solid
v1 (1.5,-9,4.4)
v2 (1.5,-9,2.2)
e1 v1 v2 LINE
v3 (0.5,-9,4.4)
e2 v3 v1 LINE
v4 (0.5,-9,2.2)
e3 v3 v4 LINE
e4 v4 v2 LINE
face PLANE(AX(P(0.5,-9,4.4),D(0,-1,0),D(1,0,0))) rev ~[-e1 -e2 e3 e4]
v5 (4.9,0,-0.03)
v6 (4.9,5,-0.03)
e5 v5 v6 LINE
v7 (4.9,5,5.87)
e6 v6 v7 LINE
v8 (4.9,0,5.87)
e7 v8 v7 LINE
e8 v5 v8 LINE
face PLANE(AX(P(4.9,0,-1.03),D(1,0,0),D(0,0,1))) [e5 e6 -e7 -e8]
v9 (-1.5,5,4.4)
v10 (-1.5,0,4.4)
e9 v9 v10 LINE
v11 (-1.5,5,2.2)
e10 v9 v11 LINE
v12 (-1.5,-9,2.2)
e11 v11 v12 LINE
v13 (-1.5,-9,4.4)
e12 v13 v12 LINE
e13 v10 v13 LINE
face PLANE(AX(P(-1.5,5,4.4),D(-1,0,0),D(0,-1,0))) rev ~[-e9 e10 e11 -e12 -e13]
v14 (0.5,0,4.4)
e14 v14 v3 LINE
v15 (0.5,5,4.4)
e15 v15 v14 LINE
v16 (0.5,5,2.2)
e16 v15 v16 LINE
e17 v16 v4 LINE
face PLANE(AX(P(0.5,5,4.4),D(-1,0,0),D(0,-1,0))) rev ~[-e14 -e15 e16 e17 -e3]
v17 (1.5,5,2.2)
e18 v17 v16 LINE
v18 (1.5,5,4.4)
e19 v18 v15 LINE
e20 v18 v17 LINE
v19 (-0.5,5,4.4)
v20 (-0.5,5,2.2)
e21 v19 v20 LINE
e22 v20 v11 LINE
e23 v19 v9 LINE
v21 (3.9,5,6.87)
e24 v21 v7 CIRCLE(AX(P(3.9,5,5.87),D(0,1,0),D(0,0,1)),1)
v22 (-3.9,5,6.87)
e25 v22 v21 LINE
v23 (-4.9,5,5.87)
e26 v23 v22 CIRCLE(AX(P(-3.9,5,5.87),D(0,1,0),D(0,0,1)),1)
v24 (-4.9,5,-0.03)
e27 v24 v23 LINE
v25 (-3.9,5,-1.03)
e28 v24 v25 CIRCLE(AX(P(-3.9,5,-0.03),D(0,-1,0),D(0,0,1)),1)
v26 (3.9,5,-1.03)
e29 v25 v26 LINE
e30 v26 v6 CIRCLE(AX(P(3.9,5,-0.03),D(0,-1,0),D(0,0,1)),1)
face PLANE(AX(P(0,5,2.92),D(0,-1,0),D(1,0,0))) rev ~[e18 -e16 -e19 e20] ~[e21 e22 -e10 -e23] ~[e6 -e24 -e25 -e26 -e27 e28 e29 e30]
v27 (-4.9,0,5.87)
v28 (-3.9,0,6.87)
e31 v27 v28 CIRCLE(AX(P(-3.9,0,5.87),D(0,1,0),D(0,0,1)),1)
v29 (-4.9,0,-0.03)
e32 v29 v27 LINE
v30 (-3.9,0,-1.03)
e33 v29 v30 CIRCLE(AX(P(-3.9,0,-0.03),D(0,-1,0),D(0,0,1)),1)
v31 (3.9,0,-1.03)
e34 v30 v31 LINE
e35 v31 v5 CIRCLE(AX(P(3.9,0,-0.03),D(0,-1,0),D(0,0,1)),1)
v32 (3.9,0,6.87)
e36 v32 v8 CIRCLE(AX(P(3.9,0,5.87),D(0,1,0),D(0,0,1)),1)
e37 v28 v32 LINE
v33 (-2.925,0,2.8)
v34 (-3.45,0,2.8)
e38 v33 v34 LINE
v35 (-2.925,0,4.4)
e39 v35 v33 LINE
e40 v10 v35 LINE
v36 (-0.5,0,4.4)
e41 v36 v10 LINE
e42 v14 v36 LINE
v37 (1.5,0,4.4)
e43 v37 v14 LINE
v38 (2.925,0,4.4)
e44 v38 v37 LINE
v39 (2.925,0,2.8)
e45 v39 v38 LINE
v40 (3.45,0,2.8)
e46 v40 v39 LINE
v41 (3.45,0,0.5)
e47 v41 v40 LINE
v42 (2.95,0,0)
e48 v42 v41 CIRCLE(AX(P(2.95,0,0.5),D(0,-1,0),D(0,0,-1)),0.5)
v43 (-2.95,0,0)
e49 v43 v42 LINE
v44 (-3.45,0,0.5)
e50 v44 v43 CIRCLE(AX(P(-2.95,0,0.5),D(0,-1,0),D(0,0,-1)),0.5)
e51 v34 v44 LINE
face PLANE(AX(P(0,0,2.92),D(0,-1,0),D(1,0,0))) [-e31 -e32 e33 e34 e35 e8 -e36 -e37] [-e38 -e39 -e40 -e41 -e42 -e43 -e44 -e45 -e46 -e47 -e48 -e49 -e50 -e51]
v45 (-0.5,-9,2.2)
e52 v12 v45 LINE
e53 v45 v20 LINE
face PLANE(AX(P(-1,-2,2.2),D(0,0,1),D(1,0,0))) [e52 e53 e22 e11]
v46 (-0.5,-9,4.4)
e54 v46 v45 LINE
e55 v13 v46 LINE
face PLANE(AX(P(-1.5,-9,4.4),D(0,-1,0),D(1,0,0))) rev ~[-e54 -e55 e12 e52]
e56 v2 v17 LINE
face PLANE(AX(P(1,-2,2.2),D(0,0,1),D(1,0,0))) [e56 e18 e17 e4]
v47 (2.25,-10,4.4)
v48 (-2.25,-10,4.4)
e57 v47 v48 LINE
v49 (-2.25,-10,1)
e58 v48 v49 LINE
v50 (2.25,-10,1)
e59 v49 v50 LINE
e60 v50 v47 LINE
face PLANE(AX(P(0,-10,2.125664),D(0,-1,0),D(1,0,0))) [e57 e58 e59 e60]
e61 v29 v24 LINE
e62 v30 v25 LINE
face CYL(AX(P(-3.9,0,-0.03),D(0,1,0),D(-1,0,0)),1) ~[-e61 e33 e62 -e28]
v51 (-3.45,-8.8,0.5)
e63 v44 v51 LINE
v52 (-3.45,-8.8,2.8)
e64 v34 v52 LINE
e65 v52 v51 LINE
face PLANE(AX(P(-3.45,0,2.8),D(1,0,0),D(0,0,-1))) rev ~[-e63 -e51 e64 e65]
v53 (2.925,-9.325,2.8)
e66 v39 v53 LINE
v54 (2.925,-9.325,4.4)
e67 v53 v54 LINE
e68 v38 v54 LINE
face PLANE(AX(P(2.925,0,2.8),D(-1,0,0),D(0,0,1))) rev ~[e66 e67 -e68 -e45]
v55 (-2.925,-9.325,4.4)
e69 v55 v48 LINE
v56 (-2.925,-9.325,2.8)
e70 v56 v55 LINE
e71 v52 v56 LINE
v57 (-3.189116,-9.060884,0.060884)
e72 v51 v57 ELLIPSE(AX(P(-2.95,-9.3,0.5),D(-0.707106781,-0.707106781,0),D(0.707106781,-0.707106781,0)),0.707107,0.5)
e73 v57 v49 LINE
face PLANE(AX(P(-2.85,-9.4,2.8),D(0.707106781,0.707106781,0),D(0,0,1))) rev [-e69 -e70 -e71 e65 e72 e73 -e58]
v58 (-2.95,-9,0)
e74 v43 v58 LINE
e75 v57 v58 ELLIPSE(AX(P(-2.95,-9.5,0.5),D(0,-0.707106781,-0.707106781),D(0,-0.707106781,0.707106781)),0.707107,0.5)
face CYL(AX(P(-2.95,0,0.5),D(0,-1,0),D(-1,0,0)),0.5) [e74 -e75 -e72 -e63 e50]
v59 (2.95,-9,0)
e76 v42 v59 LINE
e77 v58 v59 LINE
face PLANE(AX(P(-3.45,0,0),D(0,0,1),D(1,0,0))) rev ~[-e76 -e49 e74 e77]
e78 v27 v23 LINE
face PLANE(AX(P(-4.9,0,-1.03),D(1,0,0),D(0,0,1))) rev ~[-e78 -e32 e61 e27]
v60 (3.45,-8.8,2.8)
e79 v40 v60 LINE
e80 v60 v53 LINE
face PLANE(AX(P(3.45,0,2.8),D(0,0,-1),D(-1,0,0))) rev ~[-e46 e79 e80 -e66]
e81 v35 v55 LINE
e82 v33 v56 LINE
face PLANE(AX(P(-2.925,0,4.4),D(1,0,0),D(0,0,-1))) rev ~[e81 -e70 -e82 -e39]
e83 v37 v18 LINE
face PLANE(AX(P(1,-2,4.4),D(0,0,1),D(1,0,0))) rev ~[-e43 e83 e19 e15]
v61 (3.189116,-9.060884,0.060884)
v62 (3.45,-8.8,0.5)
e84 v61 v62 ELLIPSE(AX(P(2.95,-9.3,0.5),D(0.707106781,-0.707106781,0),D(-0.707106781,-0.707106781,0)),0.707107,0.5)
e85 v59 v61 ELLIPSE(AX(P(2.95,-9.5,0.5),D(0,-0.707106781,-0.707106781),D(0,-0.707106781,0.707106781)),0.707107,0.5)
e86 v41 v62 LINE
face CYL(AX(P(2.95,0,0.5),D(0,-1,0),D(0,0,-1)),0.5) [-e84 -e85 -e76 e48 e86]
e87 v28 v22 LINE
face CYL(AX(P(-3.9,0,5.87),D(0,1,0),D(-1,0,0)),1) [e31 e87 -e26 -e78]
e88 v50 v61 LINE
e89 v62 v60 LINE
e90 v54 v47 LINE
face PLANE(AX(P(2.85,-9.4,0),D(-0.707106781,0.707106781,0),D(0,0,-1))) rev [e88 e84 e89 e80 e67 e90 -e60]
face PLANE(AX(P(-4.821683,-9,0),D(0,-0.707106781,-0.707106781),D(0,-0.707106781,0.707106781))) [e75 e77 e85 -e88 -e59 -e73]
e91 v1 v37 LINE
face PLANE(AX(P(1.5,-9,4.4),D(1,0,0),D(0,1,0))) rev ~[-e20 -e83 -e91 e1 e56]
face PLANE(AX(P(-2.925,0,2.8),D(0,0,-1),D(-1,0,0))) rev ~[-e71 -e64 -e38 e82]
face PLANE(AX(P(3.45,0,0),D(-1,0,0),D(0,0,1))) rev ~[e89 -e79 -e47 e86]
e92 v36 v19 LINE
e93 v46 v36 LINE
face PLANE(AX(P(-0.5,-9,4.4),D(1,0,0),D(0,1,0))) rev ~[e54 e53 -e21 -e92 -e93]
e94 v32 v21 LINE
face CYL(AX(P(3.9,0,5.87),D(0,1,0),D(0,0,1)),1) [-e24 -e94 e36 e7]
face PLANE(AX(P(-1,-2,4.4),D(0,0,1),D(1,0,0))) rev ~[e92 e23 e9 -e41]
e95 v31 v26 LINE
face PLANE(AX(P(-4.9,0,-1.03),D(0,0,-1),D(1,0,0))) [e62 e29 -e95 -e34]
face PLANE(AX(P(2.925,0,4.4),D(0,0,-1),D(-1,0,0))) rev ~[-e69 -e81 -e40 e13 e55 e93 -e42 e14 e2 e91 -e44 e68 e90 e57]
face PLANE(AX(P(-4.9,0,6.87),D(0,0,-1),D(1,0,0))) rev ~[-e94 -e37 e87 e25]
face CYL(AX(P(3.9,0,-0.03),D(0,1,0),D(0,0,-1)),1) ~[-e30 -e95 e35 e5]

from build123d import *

# Parameters (mm, degrees)
F1_DEPTH    = 10
F2_SIZE     = 1.2
F3_R        = 0.5
F5_W        = 9.8
F5_H        = 7.9
F6_DEPTH    = 5
F8_DEPTH    = 2.2
F9_T1_DEPTH = 9.6433659759
F10_R       = 1


# Not quite as in the source:
# - a fillet or chamfer that OpenCascade refuses, or shapes differently, is made with other operations: its cross-section is extruded or revolved along the edge and cut away or added


with BuildPart() as f1:
    # F0 (on Front) → F1 (new body)
    with BuildSketch(Plane.XZ):
        Polygon((-3.45, 2.8), (-3.45, 0), (3.45, 0), (3.45, 2.8), (2.925, 2.8), (2.925, 4.4), (-2.925, 4.4), (-2.925, 2.8), align=None)
    extrude(amount=F1_DEPTH)

    # F2
    f2_edges = [f1.edges().sort_by_distance(p)[0] for p in [
        (3.45, -10, 1.4),
        (-3.45, -10, 1.4),
    ]]
    chamfer(f2_edges, length=F2_SIZE)

    # F3
    f3_edges = [f1.edges().sort_by_distance(p)[0] for p in [
        (-3.45, -4.4, 0),
        (3.45, -4.4, 0),
    ]]
    fillet(f3_edges, radius=F3_R)

    # F5 (on Front) → F6 (join)
    with BuildSketch(Plane.XZ):
        with Locations((0, 2.92)):
            Rectangle(F5_W, F5_H)
    extrude(amount=-F6_DEPTH)

    # F7 (on offset) → F8 (cut)
    with BuildSketch(Plane.XY.offset(4.4)):
        Polygon((-1.5, 0), (-1.5, -9), (-0.5, -9), (-0.5, 5), (-1.5, 5), align=None)
        Polygon((1.5, 5), (0.5, 5), (0.5, -9), (1.5, -9), (1.5, 0), align=None)
    extrude(amount=-F8_DEPTH, mode=Mode.SUBTRACT)

    # F9: chamfer of 1 on 1 edges, made by hand

    # F9_s2 → F9_t1 (cut)
    with BuildSketch(Plane.YZ.offset(-4.821682988)):
        Polygon((-9, 0), (-10, 1), (-10, 0), align=None)
    extrude(amount=F9_T1_DEPTH, mode=Mode.SUBTRACT)

    # F10
    f10_edges = [f1.edges().sort_by_distance(p)[0] for p in [
        (4.9, 2.5, 6.87),
        (4.9, 2.5, -1.03),
        (-4.9, 2.5, -1.03),
        (-4.9, 2.5, 6.87),
    ]]
    fillet(f10_edges, radius=F10_R)


solid = f1.part
